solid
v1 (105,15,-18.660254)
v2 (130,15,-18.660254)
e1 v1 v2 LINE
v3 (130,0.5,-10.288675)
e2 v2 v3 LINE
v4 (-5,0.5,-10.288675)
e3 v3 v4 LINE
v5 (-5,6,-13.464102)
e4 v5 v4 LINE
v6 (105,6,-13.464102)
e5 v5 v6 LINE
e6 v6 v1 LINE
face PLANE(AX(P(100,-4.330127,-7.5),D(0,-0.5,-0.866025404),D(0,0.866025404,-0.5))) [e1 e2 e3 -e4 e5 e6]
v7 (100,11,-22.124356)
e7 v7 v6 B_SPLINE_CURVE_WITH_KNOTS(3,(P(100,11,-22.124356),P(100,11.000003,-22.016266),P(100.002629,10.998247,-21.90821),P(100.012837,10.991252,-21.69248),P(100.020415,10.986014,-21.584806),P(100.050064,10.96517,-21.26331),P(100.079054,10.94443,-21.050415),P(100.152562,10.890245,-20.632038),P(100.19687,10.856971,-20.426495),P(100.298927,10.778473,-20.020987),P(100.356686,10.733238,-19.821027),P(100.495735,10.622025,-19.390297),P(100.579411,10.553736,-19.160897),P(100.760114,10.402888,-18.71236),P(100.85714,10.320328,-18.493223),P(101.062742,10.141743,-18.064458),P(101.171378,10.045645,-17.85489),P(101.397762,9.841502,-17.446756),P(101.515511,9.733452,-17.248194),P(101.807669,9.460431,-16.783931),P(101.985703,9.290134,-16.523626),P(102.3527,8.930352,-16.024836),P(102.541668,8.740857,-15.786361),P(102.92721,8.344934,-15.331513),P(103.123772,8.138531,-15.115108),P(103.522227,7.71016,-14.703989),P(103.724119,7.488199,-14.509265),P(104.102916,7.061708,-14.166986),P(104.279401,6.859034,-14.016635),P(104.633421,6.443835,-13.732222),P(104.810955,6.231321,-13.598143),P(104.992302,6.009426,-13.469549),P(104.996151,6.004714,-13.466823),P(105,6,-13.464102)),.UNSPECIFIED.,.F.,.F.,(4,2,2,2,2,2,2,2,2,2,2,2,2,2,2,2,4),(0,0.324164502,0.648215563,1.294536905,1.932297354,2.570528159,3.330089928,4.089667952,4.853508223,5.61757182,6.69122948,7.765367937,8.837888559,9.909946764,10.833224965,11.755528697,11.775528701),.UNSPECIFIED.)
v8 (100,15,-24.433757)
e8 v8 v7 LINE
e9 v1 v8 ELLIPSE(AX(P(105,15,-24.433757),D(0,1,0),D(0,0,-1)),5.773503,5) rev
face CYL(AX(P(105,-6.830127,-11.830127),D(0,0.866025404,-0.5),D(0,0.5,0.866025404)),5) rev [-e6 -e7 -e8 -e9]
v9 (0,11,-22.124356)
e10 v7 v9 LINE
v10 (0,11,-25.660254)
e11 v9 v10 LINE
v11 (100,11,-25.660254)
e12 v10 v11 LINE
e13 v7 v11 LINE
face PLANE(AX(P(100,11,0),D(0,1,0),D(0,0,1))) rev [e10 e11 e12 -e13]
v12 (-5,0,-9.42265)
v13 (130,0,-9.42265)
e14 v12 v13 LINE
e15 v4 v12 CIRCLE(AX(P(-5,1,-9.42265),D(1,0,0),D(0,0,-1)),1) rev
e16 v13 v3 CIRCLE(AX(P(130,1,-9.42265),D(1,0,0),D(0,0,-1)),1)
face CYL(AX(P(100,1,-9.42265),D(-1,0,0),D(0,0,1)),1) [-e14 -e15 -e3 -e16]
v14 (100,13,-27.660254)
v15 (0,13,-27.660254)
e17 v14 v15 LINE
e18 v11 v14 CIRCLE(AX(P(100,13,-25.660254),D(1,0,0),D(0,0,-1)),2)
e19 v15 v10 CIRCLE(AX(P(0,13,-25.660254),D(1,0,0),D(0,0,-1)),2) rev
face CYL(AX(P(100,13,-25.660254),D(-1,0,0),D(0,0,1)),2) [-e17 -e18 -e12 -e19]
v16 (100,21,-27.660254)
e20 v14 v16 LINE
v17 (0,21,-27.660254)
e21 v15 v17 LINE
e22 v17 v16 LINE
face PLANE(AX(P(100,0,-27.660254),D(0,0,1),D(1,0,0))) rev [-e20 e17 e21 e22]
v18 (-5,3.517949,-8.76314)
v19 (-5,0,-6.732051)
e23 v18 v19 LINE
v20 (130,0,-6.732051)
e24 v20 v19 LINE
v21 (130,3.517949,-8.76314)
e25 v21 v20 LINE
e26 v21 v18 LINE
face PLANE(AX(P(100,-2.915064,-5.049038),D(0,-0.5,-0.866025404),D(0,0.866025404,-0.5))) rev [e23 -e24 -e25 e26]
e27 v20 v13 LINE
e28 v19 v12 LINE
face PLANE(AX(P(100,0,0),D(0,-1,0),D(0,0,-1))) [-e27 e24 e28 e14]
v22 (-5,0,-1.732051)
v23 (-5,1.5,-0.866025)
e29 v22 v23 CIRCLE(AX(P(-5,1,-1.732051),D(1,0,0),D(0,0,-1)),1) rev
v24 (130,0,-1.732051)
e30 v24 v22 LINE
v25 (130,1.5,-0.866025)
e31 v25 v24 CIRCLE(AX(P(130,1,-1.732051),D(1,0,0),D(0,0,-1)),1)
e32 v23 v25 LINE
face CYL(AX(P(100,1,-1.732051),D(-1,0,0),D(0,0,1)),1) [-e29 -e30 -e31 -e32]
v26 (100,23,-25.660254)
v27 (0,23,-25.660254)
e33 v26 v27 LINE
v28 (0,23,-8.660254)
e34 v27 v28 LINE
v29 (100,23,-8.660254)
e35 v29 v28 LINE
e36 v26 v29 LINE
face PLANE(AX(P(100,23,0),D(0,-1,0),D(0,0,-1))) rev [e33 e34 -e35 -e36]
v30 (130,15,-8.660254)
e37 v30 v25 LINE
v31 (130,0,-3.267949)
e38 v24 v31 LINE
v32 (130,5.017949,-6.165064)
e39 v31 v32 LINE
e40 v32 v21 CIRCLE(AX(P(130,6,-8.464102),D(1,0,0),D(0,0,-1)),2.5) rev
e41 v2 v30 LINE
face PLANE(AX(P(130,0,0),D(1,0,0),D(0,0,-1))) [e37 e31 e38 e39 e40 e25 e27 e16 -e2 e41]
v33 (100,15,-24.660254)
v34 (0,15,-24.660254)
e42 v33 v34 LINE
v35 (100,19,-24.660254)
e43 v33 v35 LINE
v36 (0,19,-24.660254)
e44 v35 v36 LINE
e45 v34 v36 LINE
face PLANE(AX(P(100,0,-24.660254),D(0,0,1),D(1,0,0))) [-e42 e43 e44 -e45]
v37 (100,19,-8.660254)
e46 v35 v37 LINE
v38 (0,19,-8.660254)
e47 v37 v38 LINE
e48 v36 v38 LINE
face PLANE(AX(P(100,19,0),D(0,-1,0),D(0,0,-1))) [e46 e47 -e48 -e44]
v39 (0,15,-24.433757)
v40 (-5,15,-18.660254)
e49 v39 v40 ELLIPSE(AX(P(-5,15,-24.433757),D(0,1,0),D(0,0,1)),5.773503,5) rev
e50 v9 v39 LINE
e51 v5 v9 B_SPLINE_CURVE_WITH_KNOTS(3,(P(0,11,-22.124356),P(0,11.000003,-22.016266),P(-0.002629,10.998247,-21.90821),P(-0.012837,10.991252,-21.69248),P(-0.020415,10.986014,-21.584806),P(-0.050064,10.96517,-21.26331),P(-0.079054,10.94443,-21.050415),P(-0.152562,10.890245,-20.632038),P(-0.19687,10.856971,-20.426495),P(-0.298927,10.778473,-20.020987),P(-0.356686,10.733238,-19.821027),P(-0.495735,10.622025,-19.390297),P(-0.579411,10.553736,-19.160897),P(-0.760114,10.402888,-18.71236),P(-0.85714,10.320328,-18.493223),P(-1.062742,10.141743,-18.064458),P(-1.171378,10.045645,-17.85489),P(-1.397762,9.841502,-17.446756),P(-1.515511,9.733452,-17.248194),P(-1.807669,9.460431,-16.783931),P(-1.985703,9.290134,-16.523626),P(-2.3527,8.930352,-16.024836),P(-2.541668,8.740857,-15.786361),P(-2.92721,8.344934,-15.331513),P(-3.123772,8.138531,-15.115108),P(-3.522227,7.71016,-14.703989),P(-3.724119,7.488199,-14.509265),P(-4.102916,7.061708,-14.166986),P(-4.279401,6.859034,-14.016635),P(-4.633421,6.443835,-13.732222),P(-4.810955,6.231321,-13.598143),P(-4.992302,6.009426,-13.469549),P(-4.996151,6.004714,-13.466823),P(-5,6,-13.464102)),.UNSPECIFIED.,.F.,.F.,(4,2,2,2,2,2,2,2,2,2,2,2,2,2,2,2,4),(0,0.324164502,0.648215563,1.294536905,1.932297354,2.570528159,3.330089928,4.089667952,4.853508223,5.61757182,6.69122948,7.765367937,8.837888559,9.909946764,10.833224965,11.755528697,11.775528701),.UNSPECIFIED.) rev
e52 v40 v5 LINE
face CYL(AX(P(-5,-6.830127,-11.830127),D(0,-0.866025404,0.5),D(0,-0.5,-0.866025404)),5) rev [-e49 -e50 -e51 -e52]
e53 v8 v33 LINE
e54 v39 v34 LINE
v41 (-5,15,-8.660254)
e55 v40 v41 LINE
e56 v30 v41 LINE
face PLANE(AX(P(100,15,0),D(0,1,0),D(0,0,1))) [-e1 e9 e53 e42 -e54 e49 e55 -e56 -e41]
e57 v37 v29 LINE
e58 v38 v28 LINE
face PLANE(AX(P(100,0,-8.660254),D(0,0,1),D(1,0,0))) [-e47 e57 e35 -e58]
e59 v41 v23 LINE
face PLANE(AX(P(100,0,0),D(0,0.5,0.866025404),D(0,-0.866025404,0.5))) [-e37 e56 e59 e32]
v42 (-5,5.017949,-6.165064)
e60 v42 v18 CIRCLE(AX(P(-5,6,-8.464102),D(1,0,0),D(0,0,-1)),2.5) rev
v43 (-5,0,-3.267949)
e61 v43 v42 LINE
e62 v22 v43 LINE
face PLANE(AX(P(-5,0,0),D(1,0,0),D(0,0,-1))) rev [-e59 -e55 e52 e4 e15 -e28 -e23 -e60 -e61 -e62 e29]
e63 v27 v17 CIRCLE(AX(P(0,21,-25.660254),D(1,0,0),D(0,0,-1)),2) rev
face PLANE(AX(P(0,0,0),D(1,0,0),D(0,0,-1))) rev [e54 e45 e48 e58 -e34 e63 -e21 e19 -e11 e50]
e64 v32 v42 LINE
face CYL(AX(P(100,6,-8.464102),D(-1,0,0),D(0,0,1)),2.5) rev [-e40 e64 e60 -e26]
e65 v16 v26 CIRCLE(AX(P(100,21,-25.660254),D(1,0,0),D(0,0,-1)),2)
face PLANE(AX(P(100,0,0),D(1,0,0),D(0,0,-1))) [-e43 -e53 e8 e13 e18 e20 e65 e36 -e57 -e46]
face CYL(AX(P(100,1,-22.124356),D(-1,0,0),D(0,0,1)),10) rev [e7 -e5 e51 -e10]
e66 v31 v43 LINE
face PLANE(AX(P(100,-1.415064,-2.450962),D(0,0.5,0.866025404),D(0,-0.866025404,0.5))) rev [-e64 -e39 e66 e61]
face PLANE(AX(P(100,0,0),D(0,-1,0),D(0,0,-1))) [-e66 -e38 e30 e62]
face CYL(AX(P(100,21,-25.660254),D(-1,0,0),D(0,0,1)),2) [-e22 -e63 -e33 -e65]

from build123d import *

# Parameters (mm, degrees)
SKETCH2_W                = 3.0000000000000036
SKETCH2_H                = 3.9999999999999982
BOSS_EXTRUDE2_DEPTH      = 100
BOSS_EXTRUDE3_DEPTH      = 30
BOSS_EXTRUDE3_DEPTH_BACK = 105
FILLET5_R                = 10
FILLET6_R                = 5
FILLET7_R                = 2
FILLET8_R                = 1


with BuildPart() as part:
    # Sketch2 → Boss-Extrude2 (new body)
    with BuildSketch(Plane(origin=(0, 0, 0), x_dir=(0, 0, -1), z_dir=(1, 0, 0))):
        Polygon((8.660254037844407, 18.999999999999996), (24.660254037844407, 19), (27.660254037844407, 19), (27.660254037844407, 23), (8.660254037844407, 22.999999999999996), align=None)
        with Locations((26.160254037844403, 17)):
            Rectangle(SKETCH2_W, SKETCH2_H)
        Polygon((24.660254037844407, 15), (18.66025403784441, 15), (16.3508529610859, 10.999999999999996), (27.66025403784441, 11), (27.660254037844407, 15), align=None)
        Polygon((18.66025403784441, 15), (8.660254037844407, 15), (8.660254037844409, 11), (16.3508529610859, 11), align=None)
        with BuildLine():
            Line((8.660254037844407, 15.000000000000002), (0, 0))
            Line((0, 0), (3.2679491924311206, 1.4e-16))
            Line((3.2679491924311206, -8.2e-16), (6.165063509461155, 5.017949192431213))
            ThreePointArc((6.165063509461059, 5.017949192431232), (7.962900689456138, 8.449244298165432), (10.964101615137764, 6))
            ThreePointArc((10.964101615137764, 5.999999999999999), (10.334608934582356, 4.341325116876664), (8.763139720814397, 3.5179491924311193))
            Line((8.763139720814408, 3.5179491924311046), (6.732050807568877, 0))
            Line((6.732050807568877, 2.8e-16), (10.000000000000004, 4.1e-16))
            Line((10.000000000000004, -1.78e-15), (16.3508529610859, 10.999999999999996))
            Line((16.3508529610859, 11), (8.660254037844409, 11))
            Line((8.660254037844409, 11), (8.660254037844407, 15))
        make_face()
    extrude(amount=BOSS_EXTRUDE2_DEPTH)

    # Sketch3 → Boss-Extrude3 (add, two sides: drawn at the far end of the back side and taken through both)
    with BuildSketch(Plane(origin=(100, 0, 0), x_dir=(0, 0, -1), z_dir=(1, 0, 0)).offset(-BOSS_EXTRUDE3_DEPTH_BACK)):
        with BuildLine():
            Line((8.66025403784439, 15.000000000000005), (0, 0))
            Line((0, 0), (3.2679491924311215, 2.8e-16))
            Line((3.267949192431121, 0), (6.1650635094611035, 5.017949192431125))
            ThreePointArc((6.165063509461104, 5.017949192431125), (7.962900689456081, 8.449244298165421), (10.964101615137764, 6))
            ThreePointArc((10.964101615137764, 5.999999999999999), (10.334608934582363, 4.341325116876672), (8.763139720814419, 3.517949192431122))
            Line((8.763139720814419, 3.517949192431122), (6.732050807568878, 3.6e-16))
            Line((6.732050807568878, 3.6e-16), (10.000000000000002, 8.7e-16))
            Line((10.000000000000004, 0), (18.66025403784441, 15.000000000000009))
            Line((18.66025403784441, 15.000000000000009), (8.66025403784439, 15.000000000000005))
        make_face()
    extrude(amount=BOSS_EXTRUDE3_DEPTH + BOSS_EXTRUDE3_DEPTH_BACK)

    # Fillet5
    fillet5_edges = [part.edges().sort_by_distance(p)[0] for p in [
        (50, 10.999999999999998, -16.3508529610859),
    ]]
    fillet(fillet5_edges, radius=FILLET5_R)

    # Fillet6
    fillet6_edges = [part.edges().sort_by_distance(p)[0] for p in [
        (0, 10.500000000000007, -16.062177826491087),
        (100, 10.500000000000007, -16.062177826491087),
    ]]
    fillet(fillet6_edges, radius=FILLET6_R - 0.0001)  # a hair under: the kernel refuses the full size

    # Fillet7
    fillet7_edges = [part.edges().sort_by_distance(p)[0] for p in [
        (50, 23, -27.660254037844407),
        (50, 11, -27.66025403784441),
    ]]
    fillet(fillet7_edges, radius=FILLET7_R)

    # Fillet8
    fillet8_edges = [part.edges().sort_by_distance(p)[0] for p in [
        (62.5, 4.3e-16, -10.000000000000004),
        (62.5, 0, 0),
    ]]
    fillet(fillet8_edges, radius=FILLET8_R)


solid = part.part
